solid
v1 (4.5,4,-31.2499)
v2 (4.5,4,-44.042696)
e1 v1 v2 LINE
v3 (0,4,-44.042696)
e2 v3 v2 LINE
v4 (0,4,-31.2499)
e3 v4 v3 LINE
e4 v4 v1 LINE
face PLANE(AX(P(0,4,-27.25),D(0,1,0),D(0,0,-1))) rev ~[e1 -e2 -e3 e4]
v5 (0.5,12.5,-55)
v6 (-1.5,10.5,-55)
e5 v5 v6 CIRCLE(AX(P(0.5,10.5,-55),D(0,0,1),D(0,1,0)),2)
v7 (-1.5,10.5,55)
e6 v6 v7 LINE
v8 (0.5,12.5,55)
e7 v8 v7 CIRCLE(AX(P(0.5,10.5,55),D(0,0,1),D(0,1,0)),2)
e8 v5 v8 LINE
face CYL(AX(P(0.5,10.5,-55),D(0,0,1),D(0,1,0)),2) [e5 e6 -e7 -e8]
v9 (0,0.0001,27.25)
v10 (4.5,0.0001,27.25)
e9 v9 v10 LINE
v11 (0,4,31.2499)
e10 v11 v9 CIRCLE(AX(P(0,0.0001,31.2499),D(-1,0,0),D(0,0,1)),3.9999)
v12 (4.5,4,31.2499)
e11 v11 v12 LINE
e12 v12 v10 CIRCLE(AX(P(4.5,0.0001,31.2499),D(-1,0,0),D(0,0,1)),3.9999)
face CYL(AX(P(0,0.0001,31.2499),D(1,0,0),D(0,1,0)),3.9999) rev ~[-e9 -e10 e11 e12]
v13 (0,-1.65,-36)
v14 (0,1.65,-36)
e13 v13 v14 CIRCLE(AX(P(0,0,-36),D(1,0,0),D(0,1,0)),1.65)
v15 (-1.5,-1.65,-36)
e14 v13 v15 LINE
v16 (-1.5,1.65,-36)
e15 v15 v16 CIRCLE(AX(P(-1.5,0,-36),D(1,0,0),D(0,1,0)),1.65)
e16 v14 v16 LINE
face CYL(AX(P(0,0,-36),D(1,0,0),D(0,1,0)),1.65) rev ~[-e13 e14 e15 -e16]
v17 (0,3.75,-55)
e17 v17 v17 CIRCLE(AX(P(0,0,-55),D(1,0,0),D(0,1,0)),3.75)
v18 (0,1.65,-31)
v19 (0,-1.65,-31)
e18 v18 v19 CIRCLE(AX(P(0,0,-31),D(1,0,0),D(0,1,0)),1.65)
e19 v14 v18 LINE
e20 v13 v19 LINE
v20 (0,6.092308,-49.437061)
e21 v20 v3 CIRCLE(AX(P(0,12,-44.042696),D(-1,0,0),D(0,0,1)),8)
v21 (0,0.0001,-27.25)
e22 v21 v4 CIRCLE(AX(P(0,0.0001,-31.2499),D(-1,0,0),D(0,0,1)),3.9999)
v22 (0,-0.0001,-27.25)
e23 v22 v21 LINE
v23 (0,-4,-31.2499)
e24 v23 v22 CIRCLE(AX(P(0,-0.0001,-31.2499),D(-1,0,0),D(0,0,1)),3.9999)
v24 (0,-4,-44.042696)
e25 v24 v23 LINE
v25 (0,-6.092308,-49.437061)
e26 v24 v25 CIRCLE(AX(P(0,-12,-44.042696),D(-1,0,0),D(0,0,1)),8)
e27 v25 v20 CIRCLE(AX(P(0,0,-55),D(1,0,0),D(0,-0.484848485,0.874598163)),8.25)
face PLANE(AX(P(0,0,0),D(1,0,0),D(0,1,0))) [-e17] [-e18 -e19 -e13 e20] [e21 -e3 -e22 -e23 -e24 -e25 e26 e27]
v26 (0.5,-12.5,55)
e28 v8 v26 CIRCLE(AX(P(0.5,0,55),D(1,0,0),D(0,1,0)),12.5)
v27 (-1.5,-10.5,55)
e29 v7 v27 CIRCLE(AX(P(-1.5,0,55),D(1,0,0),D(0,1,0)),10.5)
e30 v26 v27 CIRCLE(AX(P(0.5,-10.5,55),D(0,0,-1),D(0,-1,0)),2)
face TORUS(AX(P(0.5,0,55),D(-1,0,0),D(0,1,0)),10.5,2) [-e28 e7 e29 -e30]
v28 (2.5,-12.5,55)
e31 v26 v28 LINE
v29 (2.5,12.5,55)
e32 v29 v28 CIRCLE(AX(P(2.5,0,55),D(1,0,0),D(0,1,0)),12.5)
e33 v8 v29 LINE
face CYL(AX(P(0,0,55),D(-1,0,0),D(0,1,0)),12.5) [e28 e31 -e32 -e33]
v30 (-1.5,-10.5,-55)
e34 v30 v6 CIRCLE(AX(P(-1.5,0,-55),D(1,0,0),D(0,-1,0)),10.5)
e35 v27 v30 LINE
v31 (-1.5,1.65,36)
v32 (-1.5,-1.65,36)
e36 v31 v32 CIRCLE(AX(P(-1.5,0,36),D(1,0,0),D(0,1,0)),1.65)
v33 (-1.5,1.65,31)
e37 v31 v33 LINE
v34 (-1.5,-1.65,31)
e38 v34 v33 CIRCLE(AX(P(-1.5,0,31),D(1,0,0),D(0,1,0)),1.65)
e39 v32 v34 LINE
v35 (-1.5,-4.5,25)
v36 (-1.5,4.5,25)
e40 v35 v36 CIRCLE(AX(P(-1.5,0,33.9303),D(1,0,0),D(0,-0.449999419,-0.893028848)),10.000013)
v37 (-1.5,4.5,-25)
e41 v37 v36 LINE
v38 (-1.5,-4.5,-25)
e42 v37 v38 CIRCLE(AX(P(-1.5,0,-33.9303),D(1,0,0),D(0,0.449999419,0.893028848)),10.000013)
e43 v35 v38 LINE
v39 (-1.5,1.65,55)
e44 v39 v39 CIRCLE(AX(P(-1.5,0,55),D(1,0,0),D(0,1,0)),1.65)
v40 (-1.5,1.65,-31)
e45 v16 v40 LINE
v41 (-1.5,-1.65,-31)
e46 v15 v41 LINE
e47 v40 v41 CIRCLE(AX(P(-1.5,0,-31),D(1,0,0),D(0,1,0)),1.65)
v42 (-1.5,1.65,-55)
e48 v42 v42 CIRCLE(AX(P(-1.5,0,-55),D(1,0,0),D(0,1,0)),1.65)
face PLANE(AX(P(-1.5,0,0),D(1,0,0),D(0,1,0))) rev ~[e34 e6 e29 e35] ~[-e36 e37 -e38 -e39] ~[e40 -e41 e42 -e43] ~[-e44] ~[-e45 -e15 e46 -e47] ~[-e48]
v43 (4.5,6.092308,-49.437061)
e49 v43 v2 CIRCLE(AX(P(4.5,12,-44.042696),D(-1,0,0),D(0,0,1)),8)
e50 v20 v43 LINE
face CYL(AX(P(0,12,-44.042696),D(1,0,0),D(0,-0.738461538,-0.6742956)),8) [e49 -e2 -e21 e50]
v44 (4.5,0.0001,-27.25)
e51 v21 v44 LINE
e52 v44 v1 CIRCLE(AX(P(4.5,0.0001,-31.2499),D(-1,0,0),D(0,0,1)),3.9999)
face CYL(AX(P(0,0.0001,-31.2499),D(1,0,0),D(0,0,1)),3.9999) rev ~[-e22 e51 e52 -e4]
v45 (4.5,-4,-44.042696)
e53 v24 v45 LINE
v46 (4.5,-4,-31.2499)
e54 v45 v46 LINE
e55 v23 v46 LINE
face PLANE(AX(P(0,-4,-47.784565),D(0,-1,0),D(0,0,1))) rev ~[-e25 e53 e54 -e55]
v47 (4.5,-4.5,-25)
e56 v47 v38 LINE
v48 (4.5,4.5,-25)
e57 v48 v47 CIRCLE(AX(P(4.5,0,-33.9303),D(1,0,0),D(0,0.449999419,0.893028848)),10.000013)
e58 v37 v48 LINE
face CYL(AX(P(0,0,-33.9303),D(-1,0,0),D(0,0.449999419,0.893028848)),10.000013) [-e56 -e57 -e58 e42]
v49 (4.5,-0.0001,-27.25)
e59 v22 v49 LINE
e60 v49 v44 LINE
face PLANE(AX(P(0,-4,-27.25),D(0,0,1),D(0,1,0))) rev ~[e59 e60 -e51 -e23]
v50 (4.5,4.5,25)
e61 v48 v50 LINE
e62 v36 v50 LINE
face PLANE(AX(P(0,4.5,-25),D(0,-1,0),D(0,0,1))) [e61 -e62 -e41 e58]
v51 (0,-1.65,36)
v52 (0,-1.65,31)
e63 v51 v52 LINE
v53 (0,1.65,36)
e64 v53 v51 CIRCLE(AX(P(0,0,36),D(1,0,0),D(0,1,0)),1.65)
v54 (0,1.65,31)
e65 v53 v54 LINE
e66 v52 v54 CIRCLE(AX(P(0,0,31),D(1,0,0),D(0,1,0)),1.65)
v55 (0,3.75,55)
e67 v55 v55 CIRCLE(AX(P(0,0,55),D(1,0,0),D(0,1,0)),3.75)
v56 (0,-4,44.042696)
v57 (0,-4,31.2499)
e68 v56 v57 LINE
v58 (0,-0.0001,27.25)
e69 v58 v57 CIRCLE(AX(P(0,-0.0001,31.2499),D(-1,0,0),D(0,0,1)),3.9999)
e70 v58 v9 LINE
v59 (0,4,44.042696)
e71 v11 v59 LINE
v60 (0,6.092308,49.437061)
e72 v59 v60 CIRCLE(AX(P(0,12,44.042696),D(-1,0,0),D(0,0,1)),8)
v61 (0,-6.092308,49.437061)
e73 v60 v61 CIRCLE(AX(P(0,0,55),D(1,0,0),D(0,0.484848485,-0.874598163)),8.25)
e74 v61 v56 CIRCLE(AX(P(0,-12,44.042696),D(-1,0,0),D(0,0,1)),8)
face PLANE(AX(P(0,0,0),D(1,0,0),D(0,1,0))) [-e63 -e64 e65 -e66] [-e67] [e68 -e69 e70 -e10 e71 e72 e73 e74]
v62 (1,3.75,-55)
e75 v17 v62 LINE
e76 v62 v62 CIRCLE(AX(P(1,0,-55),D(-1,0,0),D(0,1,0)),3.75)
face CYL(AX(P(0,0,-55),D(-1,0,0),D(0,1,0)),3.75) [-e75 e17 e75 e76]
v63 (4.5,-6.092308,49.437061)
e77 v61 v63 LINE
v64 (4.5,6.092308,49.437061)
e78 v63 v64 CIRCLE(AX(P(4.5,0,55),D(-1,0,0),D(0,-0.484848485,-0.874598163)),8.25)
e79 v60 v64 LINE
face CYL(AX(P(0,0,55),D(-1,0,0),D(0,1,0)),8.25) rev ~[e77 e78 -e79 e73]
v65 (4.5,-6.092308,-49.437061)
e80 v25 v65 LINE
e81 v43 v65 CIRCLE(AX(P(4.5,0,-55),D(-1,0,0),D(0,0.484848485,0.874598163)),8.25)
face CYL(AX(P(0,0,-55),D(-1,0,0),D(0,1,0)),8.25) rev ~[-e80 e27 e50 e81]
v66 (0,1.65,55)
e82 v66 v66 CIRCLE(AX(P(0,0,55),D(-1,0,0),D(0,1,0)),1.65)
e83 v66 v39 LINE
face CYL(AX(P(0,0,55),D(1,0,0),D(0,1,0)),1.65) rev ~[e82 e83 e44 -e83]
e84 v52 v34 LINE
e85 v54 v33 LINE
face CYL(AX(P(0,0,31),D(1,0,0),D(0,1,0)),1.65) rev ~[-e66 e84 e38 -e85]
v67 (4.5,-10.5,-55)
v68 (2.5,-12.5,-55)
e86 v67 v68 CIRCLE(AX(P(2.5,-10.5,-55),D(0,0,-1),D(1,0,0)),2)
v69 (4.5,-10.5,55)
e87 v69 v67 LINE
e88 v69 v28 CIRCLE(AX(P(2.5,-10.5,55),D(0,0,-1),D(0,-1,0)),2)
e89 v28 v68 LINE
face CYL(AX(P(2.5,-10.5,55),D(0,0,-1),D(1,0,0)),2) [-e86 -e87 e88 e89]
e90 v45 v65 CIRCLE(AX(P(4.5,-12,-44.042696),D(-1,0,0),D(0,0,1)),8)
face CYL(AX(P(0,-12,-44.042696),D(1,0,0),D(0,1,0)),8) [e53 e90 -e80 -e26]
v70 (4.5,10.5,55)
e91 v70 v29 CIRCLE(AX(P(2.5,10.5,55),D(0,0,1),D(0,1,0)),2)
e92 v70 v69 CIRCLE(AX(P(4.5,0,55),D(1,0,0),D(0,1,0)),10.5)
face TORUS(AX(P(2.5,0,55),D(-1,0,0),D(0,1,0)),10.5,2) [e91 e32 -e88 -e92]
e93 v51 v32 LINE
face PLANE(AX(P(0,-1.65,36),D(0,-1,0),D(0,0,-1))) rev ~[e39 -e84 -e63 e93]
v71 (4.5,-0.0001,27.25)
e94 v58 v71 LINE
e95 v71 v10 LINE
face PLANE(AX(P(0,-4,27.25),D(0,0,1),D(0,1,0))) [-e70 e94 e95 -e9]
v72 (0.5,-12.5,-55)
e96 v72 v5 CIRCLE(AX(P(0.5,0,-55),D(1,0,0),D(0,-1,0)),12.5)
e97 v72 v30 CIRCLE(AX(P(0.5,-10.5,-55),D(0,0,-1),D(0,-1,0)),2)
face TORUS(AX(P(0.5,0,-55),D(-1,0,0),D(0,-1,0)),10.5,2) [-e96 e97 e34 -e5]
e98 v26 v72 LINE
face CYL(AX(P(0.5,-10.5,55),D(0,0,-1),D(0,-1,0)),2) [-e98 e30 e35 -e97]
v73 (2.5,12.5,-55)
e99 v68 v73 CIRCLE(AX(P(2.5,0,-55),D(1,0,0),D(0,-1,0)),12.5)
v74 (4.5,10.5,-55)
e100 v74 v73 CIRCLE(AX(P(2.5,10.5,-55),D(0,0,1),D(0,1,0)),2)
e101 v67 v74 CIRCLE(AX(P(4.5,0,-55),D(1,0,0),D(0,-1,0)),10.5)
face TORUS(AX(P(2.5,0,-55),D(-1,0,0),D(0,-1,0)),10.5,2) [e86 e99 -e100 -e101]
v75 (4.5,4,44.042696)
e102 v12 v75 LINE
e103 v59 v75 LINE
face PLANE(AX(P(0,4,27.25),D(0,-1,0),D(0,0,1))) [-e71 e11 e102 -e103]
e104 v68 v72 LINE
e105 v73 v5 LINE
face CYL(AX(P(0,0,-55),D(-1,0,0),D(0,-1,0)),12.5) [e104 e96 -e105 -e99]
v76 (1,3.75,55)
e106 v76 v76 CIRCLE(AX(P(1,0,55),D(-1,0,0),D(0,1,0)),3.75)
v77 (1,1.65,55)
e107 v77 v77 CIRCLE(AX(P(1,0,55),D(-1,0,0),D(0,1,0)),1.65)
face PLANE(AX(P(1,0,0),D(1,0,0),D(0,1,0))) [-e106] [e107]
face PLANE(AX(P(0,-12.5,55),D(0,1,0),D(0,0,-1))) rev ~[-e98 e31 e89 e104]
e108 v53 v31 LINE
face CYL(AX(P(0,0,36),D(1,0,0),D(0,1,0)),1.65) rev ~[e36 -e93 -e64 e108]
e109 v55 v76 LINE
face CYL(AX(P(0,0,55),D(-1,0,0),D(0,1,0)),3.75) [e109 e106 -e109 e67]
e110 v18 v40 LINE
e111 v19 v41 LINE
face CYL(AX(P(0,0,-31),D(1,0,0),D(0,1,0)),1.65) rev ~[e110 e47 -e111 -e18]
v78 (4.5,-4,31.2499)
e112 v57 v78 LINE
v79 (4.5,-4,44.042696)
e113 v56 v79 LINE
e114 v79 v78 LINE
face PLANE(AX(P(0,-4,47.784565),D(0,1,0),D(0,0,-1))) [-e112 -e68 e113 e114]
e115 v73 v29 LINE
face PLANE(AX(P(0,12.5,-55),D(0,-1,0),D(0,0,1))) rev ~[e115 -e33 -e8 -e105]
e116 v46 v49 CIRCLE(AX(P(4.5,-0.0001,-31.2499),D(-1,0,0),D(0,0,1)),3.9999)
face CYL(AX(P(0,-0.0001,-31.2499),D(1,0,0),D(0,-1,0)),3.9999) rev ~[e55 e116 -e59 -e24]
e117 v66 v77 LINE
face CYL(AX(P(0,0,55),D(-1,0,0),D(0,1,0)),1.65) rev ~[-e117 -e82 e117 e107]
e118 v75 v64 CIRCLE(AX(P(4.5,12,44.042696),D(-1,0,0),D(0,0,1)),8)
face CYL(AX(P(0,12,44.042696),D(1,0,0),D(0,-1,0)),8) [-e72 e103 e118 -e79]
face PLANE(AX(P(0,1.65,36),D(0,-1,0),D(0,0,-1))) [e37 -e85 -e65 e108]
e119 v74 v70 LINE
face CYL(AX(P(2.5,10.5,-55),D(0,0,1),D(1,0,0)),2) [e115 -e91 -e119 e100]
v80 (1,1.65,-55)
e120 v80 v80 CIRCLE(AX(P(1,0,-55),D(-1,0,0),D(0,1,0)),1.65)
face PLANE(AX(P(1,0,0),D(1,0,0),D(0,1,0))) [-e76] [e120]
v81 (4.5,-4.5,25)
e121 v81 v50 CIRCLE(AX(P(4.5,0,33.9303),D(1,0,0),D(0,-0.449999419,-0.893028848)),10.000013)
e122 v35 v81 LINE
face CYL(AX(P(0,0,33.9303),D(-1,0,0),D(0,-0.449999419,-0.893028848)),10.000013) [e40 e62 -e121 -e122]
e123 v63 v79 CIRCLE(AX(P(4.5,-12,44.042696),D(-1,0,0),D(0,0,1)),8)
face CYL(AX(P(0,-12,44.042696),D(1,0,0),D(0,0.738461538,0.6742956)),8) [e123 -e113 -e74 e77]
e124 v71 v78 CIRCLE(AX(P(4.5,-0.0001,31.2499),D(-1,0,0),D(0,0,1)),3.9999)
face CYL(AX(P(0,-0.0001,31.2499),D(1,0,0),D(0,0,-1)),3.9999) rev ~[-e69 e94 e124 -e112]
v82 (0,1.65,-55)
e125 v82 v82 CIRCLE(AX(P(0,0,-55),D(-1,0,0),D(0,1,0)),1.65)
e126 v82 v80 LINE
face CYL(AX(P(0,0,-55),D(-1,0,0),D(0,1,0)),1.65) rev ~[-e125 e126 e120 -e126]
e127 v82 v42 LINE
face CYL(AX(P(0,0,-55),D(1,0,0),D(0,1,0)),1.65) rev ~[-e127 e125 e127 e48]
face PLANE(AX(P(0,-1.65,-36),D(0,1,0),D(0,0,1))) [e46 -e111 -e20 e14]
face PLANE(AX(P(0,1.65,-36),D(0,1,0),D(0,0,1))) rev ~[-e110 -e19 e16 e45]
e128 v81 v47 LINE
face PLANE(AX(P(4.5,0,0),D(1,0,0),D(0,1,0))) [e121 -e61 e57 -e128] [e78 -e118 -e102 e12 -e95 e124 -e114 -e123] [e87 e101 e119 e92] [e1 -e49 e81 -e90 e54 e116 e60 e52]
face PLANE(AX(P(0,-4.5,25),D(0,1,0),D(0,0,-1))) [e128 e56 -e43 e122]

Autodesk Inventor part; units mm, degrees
ref_plane "YZ Plane" through (0, 0, 0) normal (1, 0, 0) x (0, 1, 0)
ref_plane "XZ Plane" through (0, 0, 0) normal (0, 1, 0) x (-1, 0, 0)
ref_plane "XY Plane" through (0, 0, 0) normal (0, 0, 1) x (1, 0, 0)
sketch "Sketch1" plane through (0, 0, 0) normal (1, 0, 0) x (0, 1, 0)
  line L0 (12.5, 55) -> (-12.5, 55)
  line L1 (-12.5, 55) -> (-12.5, -55)
  line L2 (-12.5, -55) -> (12.5, -55)
  line L3 (12.5, -55) -> (12.5, 55)
  arc A0 (12.5, 55) -> (-12.5, 55) centre (0, 55) ccw
  arc A1 (-12.5, -55) -> (12.5, -55) centre (0, -55) ccw
  circle A2 centre (0, 55) radius 1.65
  circle A3 centre (0, 55) radius 3.75
  circle A4 centre (0, 55) radius 8.25
  line L4 (4, 55) -> (-4, 55)
  line L5 (-4, 55) -> (-4, 27.25)
  line L6 (-4, 27.25) -> (4, 27.25)
  line L7 (4, 27.25) -> (4, 55)
  circle A5 centre (0, 31) radius 1.65
  circle A6 centre (0, 36) radius 1.65
  line L8 (1.65, 36) -> (1.65, 31)
  line L9 (-1.65, 36) -> (-1.65, 31)
  line L10 (12.5, 0) -> (-12.5, 0) construction
  circle A7 centre (0, -55) radius 1.65
  circle A8 centre (0, -55) radius 3.75
  circle A9 centre (0, -55) radius 8.25
  line L11 (-4, -55) -> (-4, -27.25)
  line L12 (-4, -27.25) -> (4, -27.25)
  line L13 (4, -27.25) -> (4, -55)
  circle A10 centre (0, -31) radius 1.65
  circle A11 centre (0, -36) radius 1.65
  line L14 (1.65, -36) -> (1.65, -31)
  line L15 (-1.65, -36) -> (-1.65, -31)
  line L16 (4.5, 25) -> (-4.5, 25)
  line L17 (-4.5, 25) -> (-4.5, -25)
  line L18 (-4.5, -25) -> (4.5, -25)
  line L19 (4.5, -25) -> (4.5, 25)
  line L20 (4.5, 25) -> (-4.5, -25) construction
  line L21 (-4.5, 25) -> (4.5, -25) construction
  arc A12 (-4.5, 25) -> (4.5, 25) centre (0, 33.9303) ccw
  arc A13 (4.5, -25) -> (-4.5, -25) centre (0, -33.9303) ccw
  point P0 (0, 0)
  point P1 (0, 55)
  point P2 (-4, -47.7846)
  point P3 (4, -47.7846)
  point P4 (4, 47.7846)
  point P5 (-4, 47.7846)
  point P6 (0, 0)
  point P7 (3.75, 55)
  point P8 (-3.75, 55)
  dimension "d0" = 110
  dimension "d1" = 55
  dimension "d2" = 12.5
  dimension "d3" = 25
  dimension "d4" = 3.3
  dimension "d5" = 7.5
  dimension "d6" = 16.5
  dimension "d7" = 8
  dimension "d8" = 4
  dimension "d10" = 36
  dimension "d11" = 3.3
  dimension "d12" = 24
  dimension "d13" = 4
  dimension "d14" = 3.3
  dimension "d15" = 5
  dimension "d16" = 4
  dimension "d34" = 50
  dimension "d35" = 8
  dimension "d36" = 8
  dimension "d37" = 10
  dimension "d38" = 10
extrude "Extrusion1" add sketch "Sketch1" along normal blind 4.5 contours L3 L2 A9 L13 L12 L11 L1 L0 A4 L5 L6 L7 | L0 A4 A0 | A1 L2 A9 | A12 L16 | L18 A13
extrude "Extrusion2" add sketch "Sketch1" against normal blind 1.5 contours L3 L2 A9 L13 L12 L11 L1 L0 A4 L5 L6 L7 | L0 A4 A0 | A4 L7 L0 | L0 A3 A4 | A1 L2 A9 | L7 A4 L5 L0 A3 | L0 L5 A4 | L7 L6 L5 A4 | A9 L2 A8 | L2 L13 A9 | A3 L0 A2 | L0 A2 A3 | L2 A8 L11 A9 L13 | A9 L11 L12 L13 | A9 L11 L2 | A8 L2 A7 | L2 A7 A8 | A12 L16 | L18 A13
extrude "Extrusion3" add sketch "Sketch1" along normal blind 1 contours A3 L0 A2 | L0 A2 A3 | A8 L2 A7 | L2 A7 A8
fillet "Fillet1" radius 4 4 edges at (2.25, -4, 27.25) (2.25, 4, 27.25) (2.25, -4, -27.25) (2.25, 4, -27.25)
fillet "Fillet2" radius 8 4 edges at (2.25, -4, -47.7846) (2.25, 4, -47.7846) (2.25, -4, 47.7846) (2.25, 4, 47.7846)
fillet "Fillet3" radius 2 8 edges at (4.5, 0, 67.5) (4.5, -12.5, 0) (4.5, 0, -67.5) (4.5, 12.5, 0) (-1.5, 0, -67.5) (-1.5, -12.5, 0) (-1.5, 0, 67.5) (-1.5, 12.5, 0)
equation "\"d0\" = FEMUR_X"
equation "\"d1\" = 0.5 * FEMUR_X"
equation "\"d2\" = 0.5 * FEMUR_WIDTH"
equation "\"d3\" = FEMUR_WIDTH"
equation "\"d4\" = HornScrewDiameter"
equation "\"d5\" = HornCentreDiameter"
equation "\"d6\" = HornDiameter"
equation "\"d7\" = HornWidth"
equation "\"d8\" = 0.5 * HornWidth"
equation "\"d10\" = HornLength"
equation "\"d11\" = HornScrewDiameter"
equation "\"d12\" = HornScrewX"
equation "\"d13\" = 0.5 * HornWidth"
equation "\"d14\" = HornScrewDiameter"
equation "\"d15\" = HornScrewLen"
equation "\"d16\" = 0.5 * HornWidth"
equation "\"d17\" = FEMUR_HEIGHT - HORN_HEIGHT"
equation "\"d19\" = HORN_HEIGHT"
equation "\"d21\" = HornCentreHeight"
equation "\"d23\" = 0.5 * HornWidth"
equation "\"d24\" = HornFillet"
equation "\"d25\" = PART_FILLET"
equation "\"FEMUR_X\" = 110"
equation "\"FEMUR_WIDTH\" = 25"
equation "\"HornScrewDiameter\" = 3.3"
equation "\"HornCentreDiameter\" = 7.5"
equation "\"HornDiameter\" = 16.5"
equation "\"HornWidth\" = 8"
equation "\"HornLength\" = 36"
equation "\"HornScrewLen\" = 5"
equation "\"FEMUR_HEIGHT\" = 6"
equation "\"HORN_HEIGHT\" = 1.5"
equation "\"HornCentreHeight\" = 1"
equation "\"HornFillet\" = 8"
equation "\"PART_FILLET\" = 2"
equation "\"HornScrewX\" = 24"
properties part number "FemurHornSide"
